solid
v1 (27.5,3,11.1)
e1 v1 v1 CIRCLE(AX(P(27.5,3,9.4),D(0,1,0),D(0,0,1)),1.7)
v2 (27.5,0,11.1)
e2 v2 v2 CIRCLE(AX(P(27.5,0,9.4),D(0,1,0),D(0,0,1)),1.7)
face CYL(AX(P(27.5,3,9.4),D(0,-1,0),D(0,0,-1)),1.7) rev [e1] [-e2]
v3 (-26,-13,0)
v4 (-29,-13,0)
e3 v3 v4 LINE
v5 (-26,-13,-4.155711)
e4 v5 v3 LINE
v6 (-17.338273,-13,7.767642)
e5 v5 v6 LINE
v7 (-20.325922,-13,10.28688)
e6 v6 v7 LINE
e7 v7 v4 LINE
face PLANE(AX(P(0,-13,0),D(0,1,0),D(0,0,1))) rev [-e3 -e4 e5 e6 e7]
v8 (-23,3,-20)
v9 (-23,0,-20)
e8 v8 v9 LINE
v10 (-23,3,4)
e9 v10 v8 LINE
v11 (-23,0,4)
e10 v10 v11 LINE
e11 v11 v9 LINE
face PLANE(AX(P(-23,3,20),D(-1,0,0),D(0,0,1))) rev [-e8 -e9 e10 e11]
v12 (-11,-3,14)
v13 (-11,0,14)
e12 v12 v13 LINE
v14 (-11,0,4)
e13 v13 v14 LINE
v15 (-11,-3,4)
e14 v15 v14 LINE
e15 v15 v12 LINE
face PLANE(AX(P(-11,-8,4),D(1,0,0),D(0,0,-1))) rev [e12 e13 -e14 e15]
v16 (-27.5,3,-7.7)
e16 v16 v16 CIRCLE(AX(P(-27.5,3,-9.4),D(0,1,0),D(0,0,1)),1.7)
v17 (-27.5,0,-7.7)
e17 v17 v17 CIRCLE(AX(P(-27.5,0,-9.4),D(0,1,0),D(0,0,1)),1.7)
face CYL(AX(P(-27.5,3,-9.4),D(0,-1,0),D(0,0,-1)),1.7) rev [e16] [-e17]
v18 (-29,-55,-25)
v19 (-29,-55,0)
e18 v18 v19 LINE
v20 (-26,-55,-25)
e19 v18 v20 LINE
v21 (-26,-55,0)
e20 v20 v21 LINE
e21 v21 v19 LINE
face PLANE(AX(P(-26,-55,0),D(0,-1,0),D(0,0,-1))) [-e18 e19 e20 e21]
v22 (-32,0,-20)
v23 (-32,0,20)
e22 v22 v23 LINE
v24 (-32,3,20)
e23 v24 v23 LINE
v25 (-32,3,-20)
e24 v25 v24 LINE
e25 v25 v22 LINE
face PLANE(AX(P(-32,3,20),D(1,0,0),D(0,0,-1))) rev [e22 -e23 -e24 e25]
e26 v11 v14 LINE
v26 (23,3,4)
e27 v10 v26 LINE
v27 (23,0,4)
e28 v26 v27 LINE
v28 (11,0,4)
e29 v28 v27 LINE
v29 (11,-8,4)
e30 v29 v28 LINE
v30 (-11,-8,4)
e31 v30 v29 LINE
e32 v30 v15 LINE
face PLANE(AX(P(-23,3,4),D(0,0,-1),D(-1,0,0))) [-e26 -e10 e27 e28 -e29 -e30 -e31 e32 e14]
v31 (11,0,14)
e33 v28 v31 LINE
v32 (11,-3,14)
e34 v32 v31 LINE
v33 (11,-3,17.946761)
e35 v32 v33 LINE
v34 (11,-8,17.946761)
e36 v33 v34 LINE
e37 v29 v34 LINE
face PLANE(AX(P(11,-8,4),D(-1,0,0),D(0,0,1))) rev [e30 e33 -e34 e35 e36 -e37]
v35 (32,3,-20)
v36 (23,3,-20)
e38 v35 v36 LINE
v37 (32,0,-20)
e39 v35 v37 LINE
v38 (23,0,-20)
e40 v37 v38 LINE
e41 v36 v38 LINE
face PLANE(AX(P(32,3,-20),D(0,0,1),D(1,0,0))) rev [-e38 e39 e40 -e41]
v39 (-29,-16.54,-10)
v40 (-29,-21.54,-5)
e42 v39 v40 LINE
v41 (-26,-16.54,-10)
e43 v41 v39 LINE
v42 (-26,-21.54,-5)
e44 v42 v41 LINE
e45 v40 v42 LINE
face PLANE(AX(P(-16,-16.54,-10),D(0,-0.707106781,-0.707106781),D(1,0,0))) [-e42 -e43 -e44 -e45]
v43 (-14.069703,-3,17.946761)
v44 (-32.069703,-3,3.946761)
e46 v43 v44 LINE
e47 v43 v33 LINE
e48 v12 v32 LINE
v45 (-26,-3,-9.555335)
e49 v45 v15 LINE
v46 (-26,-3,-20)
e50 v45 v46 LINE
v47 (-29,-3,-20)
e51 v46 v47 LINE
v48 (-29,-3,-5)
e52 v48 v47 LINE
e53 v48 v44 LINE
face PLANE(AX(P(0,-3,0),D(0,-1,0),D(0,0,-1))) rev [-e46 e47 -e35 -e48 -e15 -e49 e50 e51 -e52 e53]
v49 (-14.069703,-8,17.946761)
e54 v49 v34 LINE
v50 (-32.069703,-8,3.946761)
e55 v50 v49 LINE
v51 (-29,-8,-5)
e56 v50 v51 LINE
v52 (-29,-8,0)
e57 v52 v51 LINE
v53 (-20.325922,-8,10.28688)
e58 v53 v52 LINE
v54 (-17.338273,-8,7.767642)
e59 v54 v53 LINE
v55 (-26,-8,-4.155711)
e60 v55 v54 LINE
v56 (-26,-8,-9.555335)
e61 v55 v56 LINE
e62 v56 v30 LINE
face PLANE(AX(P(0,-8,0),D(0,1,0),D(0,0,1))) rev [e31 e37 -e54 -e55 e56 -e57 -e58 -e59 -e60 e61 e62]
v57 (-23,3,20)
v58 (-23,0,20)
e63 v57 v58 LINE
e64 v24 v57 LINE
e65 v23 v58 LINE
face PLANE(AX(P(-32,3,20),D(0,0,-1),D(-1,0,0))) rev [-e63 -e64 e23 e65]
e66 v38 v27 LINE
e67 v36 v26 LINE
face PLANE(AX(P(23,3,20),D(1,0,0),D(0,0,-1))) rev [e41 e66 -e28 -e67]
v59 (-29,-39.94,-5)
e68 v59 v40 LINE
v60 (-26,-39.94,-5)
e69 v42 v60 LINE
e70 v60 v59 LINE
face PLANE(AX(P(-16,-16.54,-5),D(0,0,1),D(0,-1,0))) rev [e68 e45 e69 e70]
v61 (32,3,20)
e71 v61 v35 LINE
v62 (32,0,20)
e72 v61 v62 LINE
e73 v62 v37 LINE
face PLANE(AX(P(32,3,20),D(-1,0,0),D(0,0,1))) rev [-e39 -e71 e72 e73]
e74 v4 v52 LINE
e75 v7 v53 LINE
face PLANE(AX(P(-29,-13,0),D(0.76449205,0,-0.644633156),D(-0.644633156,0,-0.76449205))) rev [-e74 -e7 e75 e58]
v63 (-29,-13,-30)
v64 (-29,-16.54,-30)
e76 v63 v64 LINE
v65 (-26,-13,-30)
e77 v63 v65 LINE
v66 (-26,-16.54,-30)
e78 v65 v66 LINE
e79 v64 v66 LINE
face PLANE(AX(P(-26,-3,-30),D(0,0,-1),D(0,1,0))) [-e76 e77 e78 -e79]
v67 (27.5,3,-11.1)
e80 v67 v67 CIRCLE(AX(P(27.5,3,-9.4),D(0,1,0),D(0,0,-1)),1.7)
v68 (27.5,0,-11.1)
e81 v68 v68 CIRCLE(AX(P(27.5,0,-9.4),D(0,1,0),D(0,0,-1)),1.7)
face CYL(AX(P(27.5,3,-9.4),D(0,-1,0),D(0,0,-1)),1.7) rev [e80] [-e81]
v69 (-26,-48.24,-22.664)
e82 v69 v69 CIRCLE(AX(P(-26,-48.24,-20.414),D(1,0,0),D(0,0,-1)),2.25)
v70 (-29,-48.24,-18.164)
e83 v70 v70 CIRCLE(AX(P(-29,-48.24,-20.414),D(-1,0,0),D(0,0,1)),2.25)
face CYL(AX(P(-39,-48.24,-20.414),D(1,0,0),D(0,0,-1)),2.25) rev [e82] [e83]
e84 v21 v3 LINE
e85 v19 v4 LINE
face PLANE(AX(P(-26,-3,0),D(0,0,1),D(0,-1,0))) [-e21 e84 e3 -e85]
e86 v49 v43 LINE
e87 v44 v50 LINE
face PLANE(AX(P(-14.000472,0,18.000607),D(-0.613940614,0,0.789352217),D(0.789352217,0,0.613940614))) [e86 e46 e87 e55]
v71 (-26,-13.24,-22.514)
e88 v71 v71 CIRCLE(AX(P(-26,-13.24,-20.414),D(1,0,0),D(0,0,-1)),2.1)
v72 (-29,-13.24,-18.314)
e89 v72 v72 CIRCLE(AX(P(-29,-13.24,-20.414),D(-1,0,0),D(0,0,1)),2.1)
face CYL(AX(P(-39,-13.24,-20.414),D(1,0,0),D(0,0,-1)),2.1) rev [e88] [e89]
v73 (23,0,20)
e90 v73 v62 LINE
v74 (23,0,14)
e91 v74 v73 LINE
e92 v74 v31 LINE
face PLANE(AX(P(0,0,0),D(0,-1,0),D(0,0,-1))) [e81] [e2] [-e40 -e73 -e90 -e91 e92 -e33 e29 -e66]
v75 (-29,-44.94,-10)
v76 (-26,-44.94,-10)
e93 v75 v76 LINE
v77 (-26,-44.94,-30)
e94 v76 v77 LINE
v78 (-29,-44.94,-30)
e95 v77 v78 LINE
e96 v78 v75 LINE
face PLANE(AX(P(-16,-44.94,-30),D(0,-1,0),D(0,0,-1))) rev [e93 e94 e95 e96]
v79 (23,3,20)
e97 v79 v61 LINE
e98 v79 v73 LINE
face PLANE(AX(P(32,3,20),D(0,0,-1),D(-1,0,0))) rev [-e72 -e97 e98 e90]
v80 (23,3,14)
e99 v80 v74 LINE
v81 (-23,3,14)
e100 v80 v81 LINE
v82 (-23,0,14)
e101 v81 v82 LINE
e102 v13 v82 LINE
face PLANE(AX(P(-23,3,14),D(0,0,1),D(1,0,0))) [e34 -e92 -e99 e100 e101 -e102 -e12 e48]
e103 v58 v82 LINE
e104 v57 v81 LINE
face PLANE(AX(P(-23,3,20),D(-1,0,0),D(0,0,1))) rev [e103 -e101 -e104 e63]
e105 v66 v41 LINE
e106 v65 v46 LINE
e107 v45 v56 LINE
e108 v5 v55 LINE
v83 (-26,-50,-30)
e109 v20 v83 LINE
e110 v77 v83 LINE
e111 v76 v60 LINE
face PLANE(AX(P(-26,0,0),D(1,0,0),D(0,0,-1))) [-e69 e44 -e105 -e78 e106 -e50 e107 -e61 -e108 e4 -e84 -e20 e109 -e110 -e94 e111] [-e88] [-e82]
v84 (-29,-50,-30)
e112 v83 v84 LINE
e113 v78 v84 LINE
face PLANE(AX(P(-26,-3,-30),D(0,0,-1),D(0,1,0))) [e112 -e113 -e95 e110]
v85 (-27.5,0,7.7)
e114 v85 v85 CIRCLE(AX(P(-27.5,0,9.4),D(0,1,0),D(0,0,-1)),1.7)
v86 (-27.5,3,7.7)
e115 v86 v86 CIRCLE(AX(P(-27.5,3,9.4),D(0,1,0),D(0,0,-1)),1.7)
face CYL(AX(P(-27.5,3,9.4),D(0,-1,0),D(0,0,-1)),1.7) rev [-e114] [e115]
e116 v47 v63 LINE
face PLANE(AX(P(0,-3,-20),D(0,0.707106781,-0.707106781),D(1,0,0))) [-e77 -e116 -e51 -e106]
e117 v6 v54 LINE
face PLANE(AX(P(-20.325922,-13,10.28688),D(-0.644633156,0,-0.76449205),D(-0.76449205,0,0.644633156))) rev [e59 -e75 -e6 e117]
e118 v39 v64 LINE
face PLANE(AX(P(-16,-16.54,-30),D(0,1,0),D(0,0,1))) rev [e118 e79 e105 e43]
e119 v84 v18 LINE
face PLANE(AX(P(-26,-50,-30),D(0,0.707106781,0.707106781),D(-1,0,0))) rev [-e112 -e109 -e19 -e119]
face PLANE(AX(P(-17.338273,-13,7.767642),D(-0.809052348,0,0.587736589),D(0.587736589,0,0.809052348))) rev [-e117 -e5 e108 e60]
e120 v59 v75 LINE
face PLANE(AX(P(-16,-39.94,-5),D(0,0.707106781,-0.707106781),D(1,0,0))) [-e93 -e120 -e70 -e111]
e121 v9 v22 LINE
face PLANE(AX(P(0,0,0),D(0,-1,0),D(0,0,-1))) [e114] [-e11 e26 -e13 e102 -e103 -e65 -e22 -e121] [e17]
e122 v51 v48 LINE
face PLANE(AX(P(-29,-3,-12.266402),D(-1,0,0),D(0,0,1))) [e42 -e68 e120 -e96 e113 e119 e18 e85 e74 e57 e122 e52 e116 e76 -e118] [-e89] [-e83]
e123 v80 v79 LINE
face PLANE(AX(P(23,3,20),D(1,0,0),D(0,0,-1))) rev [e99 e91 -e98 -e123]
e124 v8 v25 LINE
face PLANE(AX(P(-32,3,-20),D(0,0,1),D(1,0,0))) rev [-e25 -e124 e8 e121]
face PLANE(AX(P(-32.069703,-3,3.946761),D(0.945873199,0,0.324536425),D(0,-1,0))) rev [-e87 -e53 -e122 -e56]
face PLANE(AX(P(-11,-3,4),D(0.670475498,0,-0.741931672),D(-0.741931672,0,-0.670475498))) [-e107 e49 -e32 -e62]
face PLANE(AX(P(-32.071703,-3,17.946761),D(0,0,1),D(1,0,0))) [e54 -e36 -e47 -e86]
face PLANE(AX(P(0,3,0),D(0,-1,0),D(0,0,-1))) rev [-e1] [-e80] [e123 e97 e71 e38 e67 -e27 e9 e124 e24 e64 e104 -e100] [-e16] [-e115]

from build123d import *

# Parameters (mm, degrees)
SKETCH_1_W          = 9
SKETCH_1_H          = 40
SKETCH_1_R          = 1.7
EXTRUDE_1_DEPTH     = 3
EXTRUDE_1_2_DEPTH   = 3
SKETCH_2_W          = 46
SKETCH_2_H          = 10
EXTRUDE_2_DEPTH     = 3
SKETCH_3_W          = 22
SKETCH_3_H          = 10
EXTRUDE_3_DEPTH     = 8
EXTRUDE_5_DEPTH     = 5
SKETCH_11_W         = 30
SKETCH_11_H         = 52
EXTRUDE_6_DEPTH     = 3
SKETCH_12_R         = 2.1
SKETCH_12_R_2       = 2.25
CUT_EXTRUDE_3_DEPTH = 13
SKETCH_13_W         = 25
SKETCH_13_H         = 28.4
CUT_EXTRUDE_4_DEPTH = 13
CHAMFER_3_SIZE      = 10
CHAMFER_4_SIZE      = 5
CHAMFER_5_SIZE      = 5
SKETCH_14_W         = 22.803508502
SKETCH_14_H         = 5
EXTRUDE_7_DEPTH     = 5
EXTRUDE_8_REACH     = 78.026
SKETCH_15_W         = 3.946761087
SKETCH_15_H         = 5
CHAMFER_6_SIZE      = 5
EXTRUDE_9_DEPTH     = 5


with BuildPart() as part:
    # 草图1 → 凸台-拉伸1 (new body)
    with BuildSketch(Plane(origin=(0, 0, 0), x_dir=(1, 0, 0), z_dir=(0, 1, 0))):
        with Locations((27.5, 0)):
            Rectangle(SKETCH_1_W, SKETCH_1_H)
        with Locations(Location((27.5, 9.4, 0), (0, 0, 90))):
            Circle(SKETCH_1_R, mode=Mode.SUBTRACT)
        with Locations(Location((27.5, -9.4, 0), (0, 0, 270))):
            Circle(SKETCH_1_R, mode=Mode.SUBTRACT)
    extrude(amount=EXTRUDE_1_DEPTH)



with BuildPart() as body_2:
    # 草图1 → Extrude 1 2 (new body)
    with BuildSketch(Plane(origin=(0, 0, 0), x_dir=(1, 0, 0), z_dir=(0, 1, 0))):
        with Locations((-27.5, 0)):
            Rectangle(SKETCH_1_W, SKETCH_1_H)
        with Locations(Location((-27.5, 9.4, 0), (0, 0, 270))):
            Circle(SKETCH_1_R, mode=Mode.SUBTRACT)
        with Locations(Location((-27.5, -9.4, 0), (0, 0, 90))):
            Circle(SKETCH_1_R, mode=Mode.SUBTRACT)
    extrude(amount=EXTRUDE_1_2_DEPTH)


with BuildPart() as part_1:
    add(part.part)

    add(body_2.part)  # 凸台-拉伸2 merges body 2
    # 草图2 → 凸台-拉伸2 (add)
    with BuildSketch(Plane(origin=(0, 0, 0), x_dir=(-1, 0, 0), z_dir=(0, -1, 0))):
        with Locations((0, -9)):
            Rectangle(SKETCH_2_W, SKETCH_2_H)
    extrude(amount=-EXTRUDE_2_DEPTH)

    # 草图3 → 凸台-拉伸3 (add)
    with BuildSketch(Plane.XZ):
        with Locations((0, 9)):
            Rectangle(SKETCH_3_W, SKETCH_3_H)
    extrude(amount=EXTRUDE_3_DEPTH)

    # 草图10 → 凸台-拉伸5 (add)
    with BuildSketch(Plane.XZ.offset(8)):
        Polygon((-11, 14), (-29, 0), (-29, -12.266402166), (-11, 4), align=None)
    extrude(amount=-EXTRUDE_5_DEPTH)

    # 草图11 → 凸台-拉伸6 (add)
    with BuildSketch(Plane.ZY.offset(29)):
        with Locations((-15, -29)):
            Rectangle(SKETCH_11_W, SKETCH_11_H)
    extrude(amount=-EXTRUDE_6_DEPTH)

    # 草图12 → 切除-拉伸3 (cut)
    with BuildSketch(Plane(origin=(-26, 0, 0), x_dir=(0, 0, -1), z_dir=(1, 0, 0))):
        with Locations((20.414, -13.24)):
            Circle(SKETCH_12_R)
        with Locations((20.414, -48.24)):
            Circle(SKETCH_12_R_2)
    extrude(amount=-CUT_EXTRUDE_3_DEPTH, mode=Mode.SUBTRACT)

    # 草图13 → 切除-拉伸4 (cut)
    with BuildSketch(Plane.ZY.offset(29)):
        with Locations((-17.5, -30.74)):
            Rectangle(SKETCH_13_W, SKETCH_13_H)
    extrude(amount=-CUT_EXTRUDE_4_DEPTH, mode=Mode.SUBTRACT)

    # 倒角3
    chamfer_3_edges = [part_1.edges().sort_by_distance(p)[0] for p in [
        (-27.5, -3, -30),
    ]]
    chamfer(chamfer_3_edges, length=CHAMFER_3_SIZE)

    # 倒角4
    chamfer_4_edges = [part_1.edges().sort_by_distance(p)[0] for p in [
        (-27.5, -55, -30),
    ]]
    chamfer(chamfer_4_edges, length=CHAMFER_4_SIZE)

    # 倒角5
    chamfer_5_edges = [part_1.edges().sort_by_distance(p)[0] for p in [
        (-27.5, -16.54, -5),
        (-27.5, -44.94, -5),
    ]]
    chamfer(chamfer_5_edges, length=CHAMFER_5_SIZE)

    # 草图14 → 凸台-拉伸7 (add)
    with BuildSketch(Plane(origin=(-10.930769231, 0, 14.053846154), x_dir=(0.7893522173763264, 0, 0.6139406135149205), z_dir=(-0.6139406135149205, 0, 0.7893522173763264))):
        with Locations((-11.489460053, -5.5)):
            Rectangle(SKETCH_14_W, SKETCH_14_H)
    extrude(amount=EXTRUDE_7_DEPTH)

    # 凸台-拉伸8: up to this plane
    extrude_8_end = Plane(origin=(-14.000472298, 0, 18.000607241), z_dir=(-0.6139406135149204, 0, 0.7893522173763263))
    # 草图15 → 凸台-拉伸8 (add, up to the surface)
    with BuildSketch(Plane(origin=(11, 0, 0), x_dir=(0, 0, -1), z_dir=(1, 0, 0)), mode=Mode.PRIVATE) as extrude_8_sk1:
        with Locations((-15.973380544, -5.5)):
            Rectangle(SKETCH_15_W, SKETCH_15_H)
    extrude_8_tool1 = split(extrude(extrude_8_sk1.sketch, amount=-EXTRUDE_8_REACH, mode=Mode.PRIVATE), bisect_by=extrude_8_end, keep=Keep.BOTH, mode=Mode.PRIVATE)
    add(extrude_8_tool1.solids().sort_by_distance((11, -5.5, 15.973381))[0])

    # 倒角6
    chamfer_6_edges = [part_1.edges().sort_by_distance(p)[0] for p in [
        (-29, -5.5, 0),
    ]]
    chamfer(chamfer_6_edges, length=CHAMFER_6_SIZE - 0.0001)  # a hair under: the kernel refuses the full size

    # 草图17 → 凸台-拉伸9 (add)
    with BuildSketch(Plane.XZ.offset(8)):
        Polygon((-29, 0), (-20.325921578, 10.286880116), (-17.338272835, 7.767642096), (-26, -4.155710702), align=None)
    extrude(amount=EXTRUDE_9_DEPTH)


solid = part_1.part
